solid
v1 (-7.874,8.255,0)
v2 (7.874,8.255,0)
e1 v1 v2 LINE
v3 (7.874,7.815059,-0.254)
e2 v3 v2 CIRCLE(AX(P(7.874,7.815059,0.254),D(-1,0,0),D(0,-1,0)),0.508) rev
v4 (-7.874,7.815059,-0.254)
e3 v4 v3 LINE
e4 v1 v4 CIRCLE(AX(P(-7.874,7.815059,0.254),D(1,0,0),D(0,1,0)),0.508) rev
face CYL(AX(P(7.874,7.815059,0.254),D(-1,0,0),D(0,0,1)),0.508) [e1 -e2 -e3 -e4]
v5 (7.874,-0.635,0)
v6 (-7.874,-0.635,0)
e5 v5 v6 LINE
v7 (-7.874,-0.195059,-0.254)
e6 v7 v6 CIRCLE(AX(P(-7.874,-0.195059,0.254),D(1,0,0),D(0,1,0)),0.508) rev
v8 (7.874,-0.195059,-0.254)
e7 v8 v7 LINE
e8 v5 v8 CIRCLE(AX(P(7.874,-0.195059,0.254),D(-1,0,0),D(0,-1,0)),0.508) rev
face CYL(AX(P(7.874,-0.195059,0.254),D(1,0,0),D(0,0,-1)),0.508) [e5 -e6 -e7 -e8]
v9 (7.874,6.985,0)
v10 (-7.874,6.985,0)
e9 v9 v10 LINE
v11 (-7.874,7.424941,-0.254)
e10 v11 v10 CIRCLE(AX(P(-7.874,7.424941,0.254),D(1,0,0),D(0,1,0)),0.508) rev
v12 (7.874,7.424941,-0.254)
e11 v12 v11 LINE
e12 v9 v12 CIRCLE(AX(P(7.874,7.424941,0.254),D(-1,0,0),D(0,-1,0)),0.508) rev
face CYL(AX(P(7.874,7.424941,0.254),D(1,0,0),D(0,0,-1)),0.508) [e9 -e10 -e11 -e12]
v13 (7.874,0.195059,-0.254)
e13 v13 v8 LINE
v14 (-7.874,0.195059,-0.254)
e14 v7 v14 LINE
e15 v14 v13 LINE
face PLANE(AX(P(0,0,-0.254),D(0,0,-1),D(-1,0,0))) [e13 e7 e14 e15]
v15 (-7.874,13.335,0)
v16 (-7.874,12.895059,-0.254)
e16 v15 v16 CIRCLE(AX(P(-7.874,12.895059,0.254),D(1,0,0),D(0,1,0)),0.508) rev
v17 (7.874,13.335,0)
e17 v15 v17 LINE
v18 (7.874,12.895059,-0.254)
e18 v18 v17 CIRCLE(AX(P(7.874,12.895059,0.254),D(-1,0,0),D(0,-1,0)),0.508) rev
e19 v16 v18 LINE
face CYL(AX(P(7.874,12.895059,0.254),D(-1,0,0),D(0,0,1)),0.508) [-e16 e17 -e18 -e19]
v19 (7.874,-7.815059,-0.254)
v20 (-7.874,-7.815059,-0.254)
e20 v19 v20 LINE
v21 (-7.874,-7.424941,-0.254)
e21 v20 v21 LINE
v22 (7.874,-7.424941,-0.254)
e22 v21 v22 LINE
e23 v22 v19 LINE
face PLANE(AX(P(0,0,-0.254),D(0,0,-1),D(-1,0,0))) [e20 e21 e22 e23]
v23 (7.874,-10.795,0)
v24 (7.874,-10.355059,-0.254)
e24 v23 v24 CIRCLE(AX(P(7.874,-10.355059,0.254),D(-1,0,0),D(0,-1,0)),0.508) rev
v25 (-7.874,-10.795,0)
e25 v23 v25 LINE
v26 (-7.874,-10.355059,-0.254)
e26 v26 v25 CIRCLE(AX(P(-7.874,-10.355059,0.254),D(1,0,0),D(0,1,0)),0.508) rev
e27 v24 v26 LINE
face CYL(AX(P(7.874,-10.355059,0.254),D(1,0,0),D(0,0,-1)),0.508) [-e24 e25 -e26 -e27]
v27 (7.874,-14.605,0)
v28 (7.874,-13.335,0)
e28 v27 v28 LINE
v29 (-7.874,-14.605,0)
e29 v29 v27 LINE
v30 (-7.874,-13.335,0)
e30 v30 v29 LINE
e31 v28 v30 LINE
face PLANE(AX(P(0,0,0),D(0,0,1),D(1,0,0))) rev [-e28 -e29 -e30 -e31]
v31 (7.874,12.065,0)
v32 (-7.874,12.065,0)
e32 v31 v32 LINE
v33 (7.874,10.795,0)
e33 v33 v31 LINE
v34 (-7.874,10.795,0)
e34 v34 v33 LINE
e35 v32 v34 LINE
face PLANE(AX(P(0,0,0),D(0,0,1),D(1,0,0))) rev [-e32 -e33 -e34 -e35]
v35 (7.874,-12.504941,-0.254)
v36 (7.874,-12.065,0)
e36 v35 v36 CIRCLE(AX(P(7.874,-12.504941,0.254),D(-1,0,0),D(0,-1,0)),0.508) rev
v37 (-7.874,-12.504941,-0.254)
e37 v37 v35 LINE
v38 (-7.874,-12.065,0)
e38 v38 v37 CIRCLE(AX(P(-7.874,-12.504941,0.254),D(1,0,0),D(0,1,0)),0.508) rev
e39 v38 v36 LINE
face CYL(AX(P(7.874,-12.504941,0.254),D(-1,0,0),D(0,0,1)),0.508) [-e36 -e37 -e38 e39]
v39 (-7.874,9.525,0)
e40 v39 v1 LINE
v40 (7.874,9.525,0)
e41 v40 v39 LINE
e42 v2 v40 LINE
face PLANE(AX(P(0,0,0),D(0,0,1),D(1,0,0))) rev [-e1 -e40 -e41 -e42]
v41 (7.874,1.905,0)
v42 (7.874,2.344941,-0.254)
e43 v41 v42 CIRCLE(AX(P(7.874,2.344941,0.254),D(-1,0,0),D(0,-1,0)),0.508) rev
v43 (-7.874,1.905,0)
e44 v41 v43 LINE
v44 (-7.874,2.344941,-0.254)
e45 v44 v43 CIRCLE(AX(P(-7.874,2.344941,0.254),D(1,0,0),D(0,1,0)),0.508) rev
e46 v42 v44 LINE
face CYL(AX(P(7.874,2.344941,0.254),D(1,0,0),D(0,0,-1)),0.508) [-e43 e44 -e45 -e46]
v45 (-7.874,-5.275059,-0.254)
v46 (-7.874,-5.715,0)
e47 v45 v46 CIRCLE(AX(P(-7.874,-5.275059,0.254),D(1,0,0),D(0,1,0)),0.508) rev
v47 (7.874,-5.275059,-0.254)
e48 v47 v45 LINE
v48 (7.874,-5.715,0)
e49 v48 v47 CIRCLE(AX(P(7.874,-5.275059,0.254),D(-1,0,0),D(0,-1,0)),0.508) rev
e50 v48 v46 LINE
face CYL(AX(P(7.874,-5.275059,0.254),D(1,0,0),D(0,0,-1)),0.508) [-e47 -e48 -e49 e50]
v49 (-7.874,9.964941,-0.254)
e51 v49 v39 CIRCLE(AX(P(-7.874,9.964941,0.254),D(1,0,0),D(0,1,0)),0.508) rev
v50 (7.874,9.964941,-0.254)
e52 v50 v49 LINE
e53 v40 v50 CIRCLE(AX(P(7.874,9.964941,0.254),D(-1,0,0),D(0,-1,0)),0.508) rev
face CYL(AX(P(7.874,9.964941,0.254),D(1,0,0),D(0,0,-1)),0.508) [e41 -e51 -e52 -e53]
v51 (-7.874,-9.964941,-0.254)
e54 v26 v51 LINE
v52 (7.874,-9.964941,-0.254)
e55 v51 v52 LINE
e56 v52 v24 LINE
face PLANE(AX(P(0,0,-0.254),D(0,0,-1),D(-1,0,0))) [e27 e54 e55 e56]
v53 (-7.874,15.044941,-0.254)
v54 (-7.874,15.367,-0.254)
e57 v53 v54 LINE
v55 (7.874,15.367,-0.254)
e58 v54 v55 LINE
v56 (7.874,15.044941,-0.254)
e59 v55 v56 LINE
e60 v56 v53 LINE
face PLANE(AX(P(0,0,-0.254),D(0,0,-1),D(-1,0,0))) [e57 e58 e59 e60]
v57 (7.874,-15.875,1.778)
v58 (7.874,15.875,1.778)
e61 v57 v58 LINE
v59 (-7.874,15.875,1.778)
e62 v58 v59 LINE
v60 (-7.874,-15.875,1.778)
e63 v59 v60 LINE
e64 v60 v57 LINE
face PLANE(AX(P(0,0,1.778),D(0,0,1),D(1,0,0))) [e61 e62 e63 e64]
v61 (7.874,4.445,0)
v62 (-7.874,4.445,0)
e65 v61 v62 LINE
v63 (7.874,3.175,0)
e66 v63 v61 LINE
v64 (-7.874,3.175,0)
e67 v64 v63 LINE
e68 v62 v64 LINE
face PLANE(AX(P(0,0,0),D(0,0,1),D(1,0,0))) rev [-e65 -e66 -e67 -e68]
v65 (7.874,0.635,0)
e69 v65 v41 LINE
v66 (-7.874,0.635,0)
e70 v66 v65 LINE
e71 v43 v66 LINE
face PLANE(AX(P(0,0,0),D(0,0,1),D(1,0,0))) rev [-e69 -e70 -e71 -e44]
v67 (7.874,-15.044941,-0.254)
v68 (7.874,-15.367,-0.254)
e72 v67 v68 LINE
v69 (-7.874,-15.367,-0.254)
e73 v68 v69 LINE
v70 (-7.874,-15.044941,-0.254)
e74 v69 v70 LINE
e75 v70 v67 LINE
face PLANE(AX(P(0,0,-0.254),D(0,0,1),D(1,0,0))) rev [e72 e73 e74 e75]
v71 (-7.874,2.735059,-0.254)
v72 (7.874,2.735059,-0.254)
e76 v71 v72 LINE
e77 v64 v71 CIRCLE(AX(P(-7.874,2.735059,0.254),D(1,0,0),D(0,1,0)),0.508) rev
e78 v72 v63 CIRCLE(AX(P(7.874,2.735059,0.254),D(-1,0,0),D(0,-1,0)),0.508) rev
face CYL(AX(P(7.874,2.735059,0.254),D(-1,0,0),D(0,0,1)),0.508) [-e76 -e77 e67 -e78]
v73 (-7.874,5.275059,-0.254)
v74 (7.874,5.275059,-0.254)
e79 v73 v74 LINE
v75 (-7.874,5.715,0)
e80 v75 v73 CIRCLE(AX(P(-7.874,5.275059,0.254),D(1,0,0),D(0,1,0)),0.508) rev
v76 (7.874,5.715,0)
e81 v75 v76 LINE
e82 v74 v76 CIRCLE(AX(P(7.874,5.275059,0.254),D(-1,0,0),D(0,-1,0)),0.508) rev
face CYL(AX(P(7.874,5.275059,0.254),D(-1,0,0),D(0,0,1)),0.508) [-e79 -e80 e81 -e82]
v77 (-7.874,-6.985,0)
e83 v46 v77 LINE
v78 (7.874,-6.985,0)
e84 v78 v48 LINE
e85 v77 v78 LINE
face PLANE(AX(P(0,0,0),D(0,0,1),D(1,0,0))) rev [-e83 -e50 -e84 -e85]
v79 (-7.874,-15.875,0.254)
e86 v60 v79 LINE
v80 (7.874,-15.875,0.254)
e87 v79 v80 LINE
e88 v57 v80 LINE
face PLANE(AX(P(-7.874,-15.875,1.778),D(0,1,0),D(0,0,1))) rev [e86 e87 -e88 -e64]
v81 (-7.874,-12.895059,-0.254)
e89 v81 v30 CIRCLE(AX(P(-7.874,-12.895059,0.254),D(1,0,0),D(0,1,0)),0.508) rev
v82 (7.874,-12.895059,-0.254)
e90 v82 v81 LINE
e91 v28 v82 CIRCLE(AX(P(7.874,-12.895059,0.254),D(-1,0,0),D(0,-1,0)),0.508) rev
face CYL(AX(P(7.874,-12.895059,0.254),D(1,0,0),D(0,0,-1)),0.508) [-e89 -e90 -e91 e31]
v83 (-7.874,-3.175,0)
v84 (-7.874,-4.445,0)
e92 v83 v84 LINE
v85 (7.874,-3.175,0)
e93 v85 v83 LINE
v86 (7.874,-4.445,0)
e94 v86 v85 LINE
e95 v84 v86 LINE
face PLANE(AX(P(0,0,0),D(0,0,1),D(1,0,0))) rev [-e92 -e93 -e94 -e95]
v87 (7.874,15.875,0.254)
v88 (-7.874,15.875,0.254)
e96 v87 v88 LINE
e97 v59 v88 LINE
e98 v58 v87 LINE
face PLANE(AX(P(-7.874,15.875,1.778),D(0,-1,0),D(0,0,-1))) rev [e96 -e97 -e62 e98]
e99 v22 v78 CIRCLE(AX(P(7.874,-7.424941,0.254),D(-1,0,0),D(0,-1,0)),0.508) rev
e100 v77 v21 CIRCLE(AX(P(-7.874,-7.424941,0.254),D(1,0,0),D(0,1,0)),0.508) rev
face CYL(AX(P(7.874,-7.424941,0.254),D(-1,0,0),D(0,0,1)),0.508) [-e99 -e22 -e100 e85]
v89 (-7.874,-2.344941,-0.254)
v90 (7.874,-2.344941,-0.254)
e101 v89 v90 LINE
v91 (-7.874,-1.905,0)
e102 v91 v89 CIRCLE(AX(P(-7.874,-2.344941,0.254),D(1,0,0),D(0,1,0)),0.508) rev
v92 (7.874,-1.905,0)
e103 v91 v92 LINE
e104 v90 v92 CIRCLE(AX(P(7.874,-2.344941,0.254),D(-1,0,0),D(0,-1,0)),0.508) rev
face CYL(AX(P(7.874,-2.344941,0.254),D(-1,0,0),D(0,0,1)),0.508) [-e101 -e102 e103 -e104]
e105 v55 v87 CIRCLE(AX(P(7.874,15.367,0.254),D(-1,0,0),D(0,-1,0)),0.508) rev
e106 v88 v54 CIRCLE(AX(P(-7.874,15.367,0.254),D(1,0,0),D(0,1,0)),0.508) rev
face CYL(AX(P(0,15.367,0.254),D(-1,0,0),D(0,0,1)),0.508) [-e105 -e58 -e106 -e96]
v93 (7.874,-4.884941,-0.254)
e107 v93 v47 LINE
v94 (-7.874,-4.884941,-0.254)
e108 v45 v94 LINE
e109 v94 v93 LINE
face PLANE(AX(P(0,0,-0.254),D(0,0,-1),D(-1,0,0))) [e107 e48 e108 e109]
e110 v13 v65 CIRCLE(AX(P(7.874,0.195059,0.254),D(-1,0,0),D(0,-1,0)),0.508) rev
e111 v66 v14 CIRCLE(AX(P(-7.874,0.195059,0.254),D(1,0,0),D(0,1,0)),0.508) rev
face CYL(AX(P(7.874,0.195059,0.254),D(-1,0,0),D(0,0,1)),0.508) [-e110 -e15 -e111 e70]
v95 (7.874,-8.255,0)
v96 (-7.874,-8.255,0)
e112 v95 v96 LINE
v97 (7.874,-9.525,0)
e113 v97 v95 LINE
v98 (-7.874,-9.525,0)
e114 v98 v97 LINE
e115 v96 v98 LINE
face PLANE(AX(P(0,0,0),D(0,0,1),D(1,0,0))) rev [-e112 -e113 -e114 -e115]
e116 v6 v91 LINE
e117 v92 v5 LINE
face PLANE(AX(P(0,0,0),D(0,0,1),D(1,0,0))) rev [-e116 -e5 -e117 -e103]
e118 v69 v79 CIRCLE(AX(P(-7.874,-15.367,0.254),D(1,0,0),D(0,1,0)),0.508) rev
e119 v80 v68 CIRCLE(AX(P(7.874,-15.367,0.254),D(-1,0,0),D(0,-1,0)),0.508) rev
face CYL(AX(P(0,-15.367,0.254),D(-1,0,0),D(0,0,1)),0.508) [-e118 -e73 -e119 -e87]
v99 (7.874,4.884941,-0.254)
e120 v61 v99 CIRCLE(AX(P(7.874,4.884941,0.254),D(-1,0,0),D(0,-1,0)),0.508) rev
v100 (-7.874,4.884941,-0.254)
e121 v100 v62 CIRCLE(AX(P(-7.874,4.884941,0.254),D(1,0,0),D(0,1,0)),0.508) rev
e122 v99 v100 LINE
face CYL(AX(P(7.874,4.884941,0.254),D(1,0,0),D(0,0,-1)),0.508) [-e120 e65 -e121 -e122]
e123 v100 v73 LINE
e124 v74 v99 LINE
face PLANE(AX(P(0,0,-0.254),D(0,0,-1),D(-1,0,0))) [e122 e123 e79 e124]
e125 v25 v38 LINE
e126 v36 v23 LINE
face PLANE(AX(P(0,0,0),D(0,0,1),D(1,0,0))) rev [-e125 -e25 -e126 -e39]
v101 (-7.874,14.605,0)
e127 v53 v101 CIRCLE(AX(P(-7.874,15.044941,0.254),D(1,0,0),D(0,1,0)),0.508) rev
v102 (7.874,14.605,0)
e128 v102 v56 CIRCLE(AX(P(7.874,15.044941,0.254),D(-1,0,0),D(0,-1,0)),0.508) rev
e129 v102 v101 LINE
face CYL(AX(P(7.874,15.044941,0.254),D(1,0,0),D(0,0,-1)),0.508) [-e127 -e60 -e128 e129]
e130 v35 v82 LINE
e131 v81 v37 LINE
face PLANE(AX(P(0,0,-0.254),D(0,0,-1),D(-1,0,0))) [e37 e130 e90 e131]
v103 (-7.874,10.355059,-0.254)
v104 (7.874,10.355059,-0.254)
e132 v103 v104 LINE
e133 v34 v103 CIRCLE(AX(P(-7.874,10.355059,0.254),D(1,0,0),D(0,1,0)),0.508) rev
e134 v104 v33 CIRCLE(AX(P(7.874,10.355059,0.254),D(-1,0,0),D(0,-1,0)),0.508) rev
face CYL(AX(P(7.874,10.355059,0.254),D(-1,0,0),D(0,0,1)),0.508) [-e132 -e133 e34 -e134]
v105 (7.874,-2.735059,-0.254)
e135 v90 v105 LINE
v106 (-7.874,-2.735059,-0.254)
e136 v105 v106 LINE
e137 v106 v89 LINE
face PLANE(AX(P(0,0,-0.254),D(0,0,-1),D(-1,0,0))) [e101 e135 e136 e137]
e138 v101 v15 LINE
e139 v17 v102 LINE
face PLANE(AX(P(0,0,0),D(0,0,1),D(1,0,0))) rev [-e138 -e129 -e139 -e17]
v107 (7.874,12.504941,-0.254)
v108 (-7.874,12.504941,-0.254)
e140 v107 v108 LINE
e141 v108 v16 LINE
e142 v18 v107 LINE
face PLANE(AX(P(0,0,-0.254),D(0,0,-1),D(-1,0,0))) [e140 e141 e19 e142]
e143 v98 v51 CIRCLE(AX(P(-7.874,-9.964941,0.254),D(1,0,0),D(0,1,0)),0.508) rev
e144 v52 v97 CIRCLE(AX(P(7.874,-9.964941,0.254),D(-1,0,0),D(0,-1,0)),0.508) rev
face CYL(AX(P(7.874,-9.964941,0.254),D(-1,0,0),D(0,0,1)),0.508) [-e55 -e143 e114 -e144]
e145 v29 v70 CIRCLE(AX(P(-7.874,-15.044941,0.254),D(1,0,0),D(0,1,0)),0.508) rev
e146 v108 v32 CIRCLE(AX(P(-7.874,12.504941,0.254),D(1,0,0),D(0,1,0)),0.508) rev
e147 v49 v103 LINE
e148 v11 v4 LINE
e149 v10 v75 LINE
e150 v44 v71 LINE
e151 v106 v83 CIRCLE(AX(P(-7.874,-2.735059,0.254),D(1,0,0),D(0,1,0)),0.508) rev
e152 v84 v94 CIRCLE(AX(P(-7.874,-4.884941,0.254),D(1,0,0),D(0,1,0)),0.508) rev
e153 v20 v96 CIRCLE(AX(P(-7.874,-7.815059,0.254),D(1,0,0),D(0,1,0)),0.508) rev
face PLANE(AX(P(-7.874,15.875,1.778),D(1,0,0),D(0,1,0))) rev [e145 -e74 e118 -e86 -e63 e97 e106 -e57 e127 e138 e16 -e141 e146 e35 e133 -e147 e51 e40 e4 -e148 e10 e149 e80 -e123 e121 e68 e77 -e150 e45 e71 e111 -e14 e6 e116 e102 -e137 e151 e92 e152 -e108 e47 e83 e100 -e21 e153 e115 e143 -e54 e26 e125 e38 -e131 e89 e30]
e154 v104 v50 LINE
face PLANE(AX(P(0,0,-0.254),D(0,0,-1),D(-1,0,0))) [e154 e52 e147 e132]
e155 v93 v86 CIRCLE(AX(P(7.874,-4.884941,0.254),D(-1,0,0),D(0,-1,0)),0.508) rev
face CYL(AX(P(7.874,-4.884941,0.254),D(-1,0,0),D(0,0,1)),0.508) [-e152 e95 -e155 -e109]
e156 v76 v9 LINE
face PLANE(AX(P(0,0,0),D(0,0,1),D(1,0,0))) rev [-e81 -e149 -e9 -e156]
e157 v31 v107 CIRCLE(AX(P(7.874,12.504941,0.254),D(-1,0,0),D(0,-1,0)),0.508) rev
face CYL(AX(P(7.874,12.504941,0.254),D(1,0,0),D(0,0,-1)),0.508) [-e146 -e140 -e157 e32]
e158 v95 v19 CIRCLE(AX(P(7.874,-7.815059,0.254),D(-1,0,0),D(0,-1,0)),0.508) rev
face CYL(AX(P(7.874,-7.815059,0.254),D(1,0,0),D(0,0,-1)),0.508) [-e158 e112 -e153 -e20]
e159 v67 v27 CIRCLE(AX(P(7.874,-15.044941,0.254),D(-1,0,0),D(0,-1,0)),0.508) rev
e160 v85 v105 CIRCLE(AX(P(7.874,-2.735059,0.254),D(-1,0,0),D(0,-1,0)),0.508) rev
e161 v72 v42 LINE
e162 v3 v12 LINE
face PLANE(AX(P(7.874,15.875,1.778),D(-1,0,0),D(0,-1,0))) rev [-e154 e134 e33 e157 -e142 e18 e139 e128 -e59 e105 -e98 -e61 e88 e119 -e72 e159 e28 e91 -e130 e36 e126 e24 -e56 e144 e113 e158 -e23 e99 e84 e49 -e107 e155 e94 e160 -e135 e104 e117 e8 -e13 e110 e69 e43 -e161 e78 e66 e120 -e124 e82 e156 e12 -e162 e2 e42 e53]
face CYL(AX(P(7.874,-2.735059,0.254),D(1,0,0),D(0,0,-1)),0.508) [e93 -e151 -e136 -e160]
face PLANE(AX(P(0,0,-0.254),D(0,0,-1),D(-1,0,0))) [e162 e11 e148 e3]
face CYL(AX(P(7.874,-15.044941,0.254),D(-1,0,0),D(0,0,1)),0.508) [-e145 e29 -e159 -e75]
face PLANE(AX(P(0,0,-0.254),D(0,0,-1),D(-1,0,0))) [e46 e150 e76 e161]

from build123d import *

# Parameters (mm, degrees)
SKETCH1_W           = 15.748
SKETCH1_H           = 31.75
BOSS_EXTRUDE1_DEPTH = 1.778
SKETCH2_W           = 15.748
SKETCH2_H           = 1.27
BOSS_EXTRUDE2_DEPTH = 0.254
FILLET1_R           = 0.508


with BuildPart() as part:
    # Sketch1 → Boss-Extrude1 (new body)
    with BuildSketch(Plane.XY):
        Rectangle(SKETCH1_W, SKETCH1_H)
    extrude(amount=BOSS_EXTRUDE1_DEPTH)

    # Sketch2 → Boss-Extrude2 (add)
    with BuildSketch(Plane(origin=(0, 0, 0), x_dir=(-1, 0, 0), z_dir=(0, 0, -1))):
        with Locations((0, -15.24)):
            Rectangle(SKETCH2_W, SKETCH2_H)
        with Locations((0, -12.7)):
            Rectangle(SKETCH2_W, SKETCH2_H)
        with Locations((0, -10.16)):
            Rectangle(SKETCH2_W, SKETCH2_H)
        with Locations((0, -7.62)):
            Rectangle(SKETCH2_W, SKETCH2_H)
        with Locations((0, -5.08)):
            Rectangle(SKETCH2_W, SKETCH2_H)
        with Locations((0, -2.54)):
            Rectangle(SKETCH2_W, SKETCH2_H)
        Rectangle(SKETCH2_W, SKETCH2_H)
        with Locations((0, 2.54)):
            Rectangle(SKETCH2_W, SKETCH2_H)
        with Locations((0, 5.08)):
            Rectangle(SKETCH2_W, SKETCH2_H)
        with Locations((0, 7.62)):
            Rectangle(SKETCH2_W, SKETCH2_H)
        with Locations((0, 10.16)):
            Rectangle(SKETCH2_W, SKETCH2_H)
        with Locations((0, 12.7)):
            Rectangle(SKETCH2_W, SKETCH2_H)
        with Locations((0, 15.24)):
            Rectangle(SKETCH2_W, SKETCH2_H)
    extrude(amount=BOSS_EXTRUDE2_DEPTH)

    # Fillet1
    # the kernel refuses this fillet: 0.508 mm, written as the material it takes off along each edge
    with BuildSketch(Plane(origin=(9.144, 15.875, -0.254), x_dir=(0, 0, 1), z_dir=(-1, 0, 0))) as fillet1_piece_1:
        with BuildLine():
            CenterArc((FILLET1_R, -FILLET1_R), FILLET1_R, 90, 90)
            Line((0, -FILLET1_R), (-FILLET1_R * 0.02, -FILLET1_R))
            Line((-FILLET1_R * 0.02, -FILLET1_R), (-FILLET1_R * 0.02, FILLET1_R * 0.02))
            Line((-FILLET1_R * 0.02, FILLET1_R * 0.02), (FILLET1_R, FILLET1_R * 0.02))
            Line((FILLET1_R, FILLET1_R * 0.02), (FILLET1_R, 0))
        make_face()
    extrude(amount=18.288, mode=Mode.SUBTRACT)
    with BuildSketch(Plane(origin=(-8.973852263, 14.605, -0.254), x_dir=(0, 0, 1), z_dir=(1, 0, 0)), Plane(origin=(-8.973852263, 12.065, -0.254), x_dir=(0, 0, 1), z_dir=(1, 0, 0)), Plane(origin=(-8.973852263, 9.525, -0.254), x_dir=(0, 0, 1), z_dir=(1, 0, 0)), Plane(origin=(-8.973852263, 6.985, -0.254), x_dir=(0, 0, 1), z_dir=(1, 0, 0)), Plane(origin=(-8.973852263, 4.445, -0.254), x_dir=(0, 0, 1), z_dir=(1, 0, 0)), Plane(origin=(-8.973852263, 1.905, -0.254), x_dir=(0, 0, 1), z_dir=(1, 0, 0)), Plane(origin=(-8.973852263, -0.635, -0.254), x_dir=(0, 0, 1), z_dir=(1, 0, 0)), Plane(origin=(-8.973852263, -3.175, -0.254), x_dir=(0, 0, 1), z_dir=(1, 0, 0)), Plane(origin=(-8.973852263, -5.715, -0.254), x_dir=(0, 0, 1), z_dir=(1, 0, 0)), Plane(origin=(-8.973852263, -8.255, -0.254), x_dir=(0, 0, 1), z_dir=(1, 0, 0)), Plane(origin=(-8.973852263, -10.795, -0.254), x_dir=(0, 0, 1), z_dir=(1, 0, 0)), Plane(origin=(-8.973852263, -13.335, -0.254), x_dir=(0, 0, 1), z_dir=(1, 0, 0))) as fillet1_piece_2:
        with BuildLine():
            CenterArc((0.508, -0.439940905), FILLET1_R, 120, 60)
            Line((0, -0.439940905), (-0.01016, -0.439940905))
            Line((-0.01016, -0.439940905), (-0.01016, 0))
            Line((-0.01016, 0), (0, 0.01016))
            ThreePointArc((0, 0.01016), (0.127, 0.01016), (0.24892, 0.008798818))
            Line((0.24892, 0.008798818), (0.254, 0))
        make_face()
    extrude(amount=17.947704526, mode=Mode.SUBTRACT)
    with BuildSketch(Plane(origin=(8.973852263, 13.335, -0.254), x_dir=(0, -1, 0), z_dir=(-1, 0, 0)), Plane(origin=(8.973852263, 10.795, -0.254), x_dir=(0, -1, 0), z_dir=(-1, 0, 0)), Plane(origin=(8.973852263, 8.255, -0.254), x_dir=(0, -1, 0), z_dir=(-1, 0, 0)), Plane(origin=(8.973852263, 5.715, -0.254), x_dir=(0, -1, 0), z_dir=(-1, 0, 0)), Plane(origin=(8.973852263, 3.175, -0.254), x_dir=(0, -1, 0), z_dir=(-1, 0, 0)), Plane(origin=(8.973852263, 0.635, -0.254), x_dir=(0, -1, 0), z_dir=(-1, 0, 0)), Plane(origin=(8.973852263, -1.905, -0.254), x_dir=(0, -1, 0), z_dir=(-1, 0, 0)), Plane(origin=(8.973852263, -4.445, -0.254), x_dir=(0, -1, 0), z_dir=(-1, 0, 0)), Plane(origin=(8.973852263, -6.985, -0.254), x_dir=(0, -1, 0), z_dir=(-1, 0, 0)), Plane(origin=(8.973852263, -9.525, -0.254), x_dir=(0, -1, 0), z_dir=(-1, 0, 0)), Plane(origin=(8.973852263, -12.065, -0.254), x_dir=(0, -1, 0), z_dir=(-1, 0, 0))) as fillet1_piece_3:
        with BuildLine():
            CenterArc((0.439940905, 0.508), FILLET1_R, 210, 60)
            Line((0, 0.254), (-0.008798818, 0.24892))
            ThreePointArc((-0.008798818, 0.24892), (-0.01016, 0.127), (-0.01016, 0))
            Line((-0.01016, 0), (0, -0.01016))
            Line((0, -0.01016), (0.439940905, -0.01016))
            Line((0.439940905, -0.01016), (0.439940905, 0))
        make_face()
    extrude(amount=17.947704526, mode=Mode.SUBTRACT)
    with BuildSketch(Plane(origin=(9.144, -15.875, -0.254), x_dir=(0, 0, 1), z_dir=(-1, 0, 0))) as fillet1_piece_4:
        with BuildLine():
            CenterArc((FILLET1_R, FILLET1_R), FILLET1_R, 180, 90)
            Line((0, FILLET1_R), (-FILLET1_R * 0.02, FILLET1_R))
            Line((-FILLET1_R * 0.02, FILLET1_R), (-FILLET1_R * 0.02, -FILLET1_R * 0.02))
            Line((-FILLET1_R * 0.02, -FILLET1_R * 0.02), (FILLET1_R, -FILLET1_R * 0.02))
            Line((FILLET1_R, -FILLET1_R * 0.02), (FILLET1_R, 0))
        make_face()
    extrude(amount=18.288, mode=Mode.SUBTRACT)
    with BuildSketch(Plane(origin=(-8.973852263, -14.605, -0.254), x_dir=(0, -1, 0), z_dir=(1, 0, 0))) as fillet1_piece_5:
        with BuildLine():
            CenterArc((0.439940905, -0.508), FILLET1_R, 90, 60)
            Line((0, -0.254), (-0.008798818, -0.24892))
            ThreePointArc((-0.008798818, -0.24892), (-0.01016, -0.127), (-0.01016, 0))
            Line((-0.01016, 0), (0, 0.01016))
            Line((0, 0.01016), (0.439940905, 0.01016))
            Line((0.439940905, 0.01016), (0.439940905, 0))
        make_face()
    extrude(amount=17.947704526, mode=Mode.SUBTRACT)


solid = part.part
